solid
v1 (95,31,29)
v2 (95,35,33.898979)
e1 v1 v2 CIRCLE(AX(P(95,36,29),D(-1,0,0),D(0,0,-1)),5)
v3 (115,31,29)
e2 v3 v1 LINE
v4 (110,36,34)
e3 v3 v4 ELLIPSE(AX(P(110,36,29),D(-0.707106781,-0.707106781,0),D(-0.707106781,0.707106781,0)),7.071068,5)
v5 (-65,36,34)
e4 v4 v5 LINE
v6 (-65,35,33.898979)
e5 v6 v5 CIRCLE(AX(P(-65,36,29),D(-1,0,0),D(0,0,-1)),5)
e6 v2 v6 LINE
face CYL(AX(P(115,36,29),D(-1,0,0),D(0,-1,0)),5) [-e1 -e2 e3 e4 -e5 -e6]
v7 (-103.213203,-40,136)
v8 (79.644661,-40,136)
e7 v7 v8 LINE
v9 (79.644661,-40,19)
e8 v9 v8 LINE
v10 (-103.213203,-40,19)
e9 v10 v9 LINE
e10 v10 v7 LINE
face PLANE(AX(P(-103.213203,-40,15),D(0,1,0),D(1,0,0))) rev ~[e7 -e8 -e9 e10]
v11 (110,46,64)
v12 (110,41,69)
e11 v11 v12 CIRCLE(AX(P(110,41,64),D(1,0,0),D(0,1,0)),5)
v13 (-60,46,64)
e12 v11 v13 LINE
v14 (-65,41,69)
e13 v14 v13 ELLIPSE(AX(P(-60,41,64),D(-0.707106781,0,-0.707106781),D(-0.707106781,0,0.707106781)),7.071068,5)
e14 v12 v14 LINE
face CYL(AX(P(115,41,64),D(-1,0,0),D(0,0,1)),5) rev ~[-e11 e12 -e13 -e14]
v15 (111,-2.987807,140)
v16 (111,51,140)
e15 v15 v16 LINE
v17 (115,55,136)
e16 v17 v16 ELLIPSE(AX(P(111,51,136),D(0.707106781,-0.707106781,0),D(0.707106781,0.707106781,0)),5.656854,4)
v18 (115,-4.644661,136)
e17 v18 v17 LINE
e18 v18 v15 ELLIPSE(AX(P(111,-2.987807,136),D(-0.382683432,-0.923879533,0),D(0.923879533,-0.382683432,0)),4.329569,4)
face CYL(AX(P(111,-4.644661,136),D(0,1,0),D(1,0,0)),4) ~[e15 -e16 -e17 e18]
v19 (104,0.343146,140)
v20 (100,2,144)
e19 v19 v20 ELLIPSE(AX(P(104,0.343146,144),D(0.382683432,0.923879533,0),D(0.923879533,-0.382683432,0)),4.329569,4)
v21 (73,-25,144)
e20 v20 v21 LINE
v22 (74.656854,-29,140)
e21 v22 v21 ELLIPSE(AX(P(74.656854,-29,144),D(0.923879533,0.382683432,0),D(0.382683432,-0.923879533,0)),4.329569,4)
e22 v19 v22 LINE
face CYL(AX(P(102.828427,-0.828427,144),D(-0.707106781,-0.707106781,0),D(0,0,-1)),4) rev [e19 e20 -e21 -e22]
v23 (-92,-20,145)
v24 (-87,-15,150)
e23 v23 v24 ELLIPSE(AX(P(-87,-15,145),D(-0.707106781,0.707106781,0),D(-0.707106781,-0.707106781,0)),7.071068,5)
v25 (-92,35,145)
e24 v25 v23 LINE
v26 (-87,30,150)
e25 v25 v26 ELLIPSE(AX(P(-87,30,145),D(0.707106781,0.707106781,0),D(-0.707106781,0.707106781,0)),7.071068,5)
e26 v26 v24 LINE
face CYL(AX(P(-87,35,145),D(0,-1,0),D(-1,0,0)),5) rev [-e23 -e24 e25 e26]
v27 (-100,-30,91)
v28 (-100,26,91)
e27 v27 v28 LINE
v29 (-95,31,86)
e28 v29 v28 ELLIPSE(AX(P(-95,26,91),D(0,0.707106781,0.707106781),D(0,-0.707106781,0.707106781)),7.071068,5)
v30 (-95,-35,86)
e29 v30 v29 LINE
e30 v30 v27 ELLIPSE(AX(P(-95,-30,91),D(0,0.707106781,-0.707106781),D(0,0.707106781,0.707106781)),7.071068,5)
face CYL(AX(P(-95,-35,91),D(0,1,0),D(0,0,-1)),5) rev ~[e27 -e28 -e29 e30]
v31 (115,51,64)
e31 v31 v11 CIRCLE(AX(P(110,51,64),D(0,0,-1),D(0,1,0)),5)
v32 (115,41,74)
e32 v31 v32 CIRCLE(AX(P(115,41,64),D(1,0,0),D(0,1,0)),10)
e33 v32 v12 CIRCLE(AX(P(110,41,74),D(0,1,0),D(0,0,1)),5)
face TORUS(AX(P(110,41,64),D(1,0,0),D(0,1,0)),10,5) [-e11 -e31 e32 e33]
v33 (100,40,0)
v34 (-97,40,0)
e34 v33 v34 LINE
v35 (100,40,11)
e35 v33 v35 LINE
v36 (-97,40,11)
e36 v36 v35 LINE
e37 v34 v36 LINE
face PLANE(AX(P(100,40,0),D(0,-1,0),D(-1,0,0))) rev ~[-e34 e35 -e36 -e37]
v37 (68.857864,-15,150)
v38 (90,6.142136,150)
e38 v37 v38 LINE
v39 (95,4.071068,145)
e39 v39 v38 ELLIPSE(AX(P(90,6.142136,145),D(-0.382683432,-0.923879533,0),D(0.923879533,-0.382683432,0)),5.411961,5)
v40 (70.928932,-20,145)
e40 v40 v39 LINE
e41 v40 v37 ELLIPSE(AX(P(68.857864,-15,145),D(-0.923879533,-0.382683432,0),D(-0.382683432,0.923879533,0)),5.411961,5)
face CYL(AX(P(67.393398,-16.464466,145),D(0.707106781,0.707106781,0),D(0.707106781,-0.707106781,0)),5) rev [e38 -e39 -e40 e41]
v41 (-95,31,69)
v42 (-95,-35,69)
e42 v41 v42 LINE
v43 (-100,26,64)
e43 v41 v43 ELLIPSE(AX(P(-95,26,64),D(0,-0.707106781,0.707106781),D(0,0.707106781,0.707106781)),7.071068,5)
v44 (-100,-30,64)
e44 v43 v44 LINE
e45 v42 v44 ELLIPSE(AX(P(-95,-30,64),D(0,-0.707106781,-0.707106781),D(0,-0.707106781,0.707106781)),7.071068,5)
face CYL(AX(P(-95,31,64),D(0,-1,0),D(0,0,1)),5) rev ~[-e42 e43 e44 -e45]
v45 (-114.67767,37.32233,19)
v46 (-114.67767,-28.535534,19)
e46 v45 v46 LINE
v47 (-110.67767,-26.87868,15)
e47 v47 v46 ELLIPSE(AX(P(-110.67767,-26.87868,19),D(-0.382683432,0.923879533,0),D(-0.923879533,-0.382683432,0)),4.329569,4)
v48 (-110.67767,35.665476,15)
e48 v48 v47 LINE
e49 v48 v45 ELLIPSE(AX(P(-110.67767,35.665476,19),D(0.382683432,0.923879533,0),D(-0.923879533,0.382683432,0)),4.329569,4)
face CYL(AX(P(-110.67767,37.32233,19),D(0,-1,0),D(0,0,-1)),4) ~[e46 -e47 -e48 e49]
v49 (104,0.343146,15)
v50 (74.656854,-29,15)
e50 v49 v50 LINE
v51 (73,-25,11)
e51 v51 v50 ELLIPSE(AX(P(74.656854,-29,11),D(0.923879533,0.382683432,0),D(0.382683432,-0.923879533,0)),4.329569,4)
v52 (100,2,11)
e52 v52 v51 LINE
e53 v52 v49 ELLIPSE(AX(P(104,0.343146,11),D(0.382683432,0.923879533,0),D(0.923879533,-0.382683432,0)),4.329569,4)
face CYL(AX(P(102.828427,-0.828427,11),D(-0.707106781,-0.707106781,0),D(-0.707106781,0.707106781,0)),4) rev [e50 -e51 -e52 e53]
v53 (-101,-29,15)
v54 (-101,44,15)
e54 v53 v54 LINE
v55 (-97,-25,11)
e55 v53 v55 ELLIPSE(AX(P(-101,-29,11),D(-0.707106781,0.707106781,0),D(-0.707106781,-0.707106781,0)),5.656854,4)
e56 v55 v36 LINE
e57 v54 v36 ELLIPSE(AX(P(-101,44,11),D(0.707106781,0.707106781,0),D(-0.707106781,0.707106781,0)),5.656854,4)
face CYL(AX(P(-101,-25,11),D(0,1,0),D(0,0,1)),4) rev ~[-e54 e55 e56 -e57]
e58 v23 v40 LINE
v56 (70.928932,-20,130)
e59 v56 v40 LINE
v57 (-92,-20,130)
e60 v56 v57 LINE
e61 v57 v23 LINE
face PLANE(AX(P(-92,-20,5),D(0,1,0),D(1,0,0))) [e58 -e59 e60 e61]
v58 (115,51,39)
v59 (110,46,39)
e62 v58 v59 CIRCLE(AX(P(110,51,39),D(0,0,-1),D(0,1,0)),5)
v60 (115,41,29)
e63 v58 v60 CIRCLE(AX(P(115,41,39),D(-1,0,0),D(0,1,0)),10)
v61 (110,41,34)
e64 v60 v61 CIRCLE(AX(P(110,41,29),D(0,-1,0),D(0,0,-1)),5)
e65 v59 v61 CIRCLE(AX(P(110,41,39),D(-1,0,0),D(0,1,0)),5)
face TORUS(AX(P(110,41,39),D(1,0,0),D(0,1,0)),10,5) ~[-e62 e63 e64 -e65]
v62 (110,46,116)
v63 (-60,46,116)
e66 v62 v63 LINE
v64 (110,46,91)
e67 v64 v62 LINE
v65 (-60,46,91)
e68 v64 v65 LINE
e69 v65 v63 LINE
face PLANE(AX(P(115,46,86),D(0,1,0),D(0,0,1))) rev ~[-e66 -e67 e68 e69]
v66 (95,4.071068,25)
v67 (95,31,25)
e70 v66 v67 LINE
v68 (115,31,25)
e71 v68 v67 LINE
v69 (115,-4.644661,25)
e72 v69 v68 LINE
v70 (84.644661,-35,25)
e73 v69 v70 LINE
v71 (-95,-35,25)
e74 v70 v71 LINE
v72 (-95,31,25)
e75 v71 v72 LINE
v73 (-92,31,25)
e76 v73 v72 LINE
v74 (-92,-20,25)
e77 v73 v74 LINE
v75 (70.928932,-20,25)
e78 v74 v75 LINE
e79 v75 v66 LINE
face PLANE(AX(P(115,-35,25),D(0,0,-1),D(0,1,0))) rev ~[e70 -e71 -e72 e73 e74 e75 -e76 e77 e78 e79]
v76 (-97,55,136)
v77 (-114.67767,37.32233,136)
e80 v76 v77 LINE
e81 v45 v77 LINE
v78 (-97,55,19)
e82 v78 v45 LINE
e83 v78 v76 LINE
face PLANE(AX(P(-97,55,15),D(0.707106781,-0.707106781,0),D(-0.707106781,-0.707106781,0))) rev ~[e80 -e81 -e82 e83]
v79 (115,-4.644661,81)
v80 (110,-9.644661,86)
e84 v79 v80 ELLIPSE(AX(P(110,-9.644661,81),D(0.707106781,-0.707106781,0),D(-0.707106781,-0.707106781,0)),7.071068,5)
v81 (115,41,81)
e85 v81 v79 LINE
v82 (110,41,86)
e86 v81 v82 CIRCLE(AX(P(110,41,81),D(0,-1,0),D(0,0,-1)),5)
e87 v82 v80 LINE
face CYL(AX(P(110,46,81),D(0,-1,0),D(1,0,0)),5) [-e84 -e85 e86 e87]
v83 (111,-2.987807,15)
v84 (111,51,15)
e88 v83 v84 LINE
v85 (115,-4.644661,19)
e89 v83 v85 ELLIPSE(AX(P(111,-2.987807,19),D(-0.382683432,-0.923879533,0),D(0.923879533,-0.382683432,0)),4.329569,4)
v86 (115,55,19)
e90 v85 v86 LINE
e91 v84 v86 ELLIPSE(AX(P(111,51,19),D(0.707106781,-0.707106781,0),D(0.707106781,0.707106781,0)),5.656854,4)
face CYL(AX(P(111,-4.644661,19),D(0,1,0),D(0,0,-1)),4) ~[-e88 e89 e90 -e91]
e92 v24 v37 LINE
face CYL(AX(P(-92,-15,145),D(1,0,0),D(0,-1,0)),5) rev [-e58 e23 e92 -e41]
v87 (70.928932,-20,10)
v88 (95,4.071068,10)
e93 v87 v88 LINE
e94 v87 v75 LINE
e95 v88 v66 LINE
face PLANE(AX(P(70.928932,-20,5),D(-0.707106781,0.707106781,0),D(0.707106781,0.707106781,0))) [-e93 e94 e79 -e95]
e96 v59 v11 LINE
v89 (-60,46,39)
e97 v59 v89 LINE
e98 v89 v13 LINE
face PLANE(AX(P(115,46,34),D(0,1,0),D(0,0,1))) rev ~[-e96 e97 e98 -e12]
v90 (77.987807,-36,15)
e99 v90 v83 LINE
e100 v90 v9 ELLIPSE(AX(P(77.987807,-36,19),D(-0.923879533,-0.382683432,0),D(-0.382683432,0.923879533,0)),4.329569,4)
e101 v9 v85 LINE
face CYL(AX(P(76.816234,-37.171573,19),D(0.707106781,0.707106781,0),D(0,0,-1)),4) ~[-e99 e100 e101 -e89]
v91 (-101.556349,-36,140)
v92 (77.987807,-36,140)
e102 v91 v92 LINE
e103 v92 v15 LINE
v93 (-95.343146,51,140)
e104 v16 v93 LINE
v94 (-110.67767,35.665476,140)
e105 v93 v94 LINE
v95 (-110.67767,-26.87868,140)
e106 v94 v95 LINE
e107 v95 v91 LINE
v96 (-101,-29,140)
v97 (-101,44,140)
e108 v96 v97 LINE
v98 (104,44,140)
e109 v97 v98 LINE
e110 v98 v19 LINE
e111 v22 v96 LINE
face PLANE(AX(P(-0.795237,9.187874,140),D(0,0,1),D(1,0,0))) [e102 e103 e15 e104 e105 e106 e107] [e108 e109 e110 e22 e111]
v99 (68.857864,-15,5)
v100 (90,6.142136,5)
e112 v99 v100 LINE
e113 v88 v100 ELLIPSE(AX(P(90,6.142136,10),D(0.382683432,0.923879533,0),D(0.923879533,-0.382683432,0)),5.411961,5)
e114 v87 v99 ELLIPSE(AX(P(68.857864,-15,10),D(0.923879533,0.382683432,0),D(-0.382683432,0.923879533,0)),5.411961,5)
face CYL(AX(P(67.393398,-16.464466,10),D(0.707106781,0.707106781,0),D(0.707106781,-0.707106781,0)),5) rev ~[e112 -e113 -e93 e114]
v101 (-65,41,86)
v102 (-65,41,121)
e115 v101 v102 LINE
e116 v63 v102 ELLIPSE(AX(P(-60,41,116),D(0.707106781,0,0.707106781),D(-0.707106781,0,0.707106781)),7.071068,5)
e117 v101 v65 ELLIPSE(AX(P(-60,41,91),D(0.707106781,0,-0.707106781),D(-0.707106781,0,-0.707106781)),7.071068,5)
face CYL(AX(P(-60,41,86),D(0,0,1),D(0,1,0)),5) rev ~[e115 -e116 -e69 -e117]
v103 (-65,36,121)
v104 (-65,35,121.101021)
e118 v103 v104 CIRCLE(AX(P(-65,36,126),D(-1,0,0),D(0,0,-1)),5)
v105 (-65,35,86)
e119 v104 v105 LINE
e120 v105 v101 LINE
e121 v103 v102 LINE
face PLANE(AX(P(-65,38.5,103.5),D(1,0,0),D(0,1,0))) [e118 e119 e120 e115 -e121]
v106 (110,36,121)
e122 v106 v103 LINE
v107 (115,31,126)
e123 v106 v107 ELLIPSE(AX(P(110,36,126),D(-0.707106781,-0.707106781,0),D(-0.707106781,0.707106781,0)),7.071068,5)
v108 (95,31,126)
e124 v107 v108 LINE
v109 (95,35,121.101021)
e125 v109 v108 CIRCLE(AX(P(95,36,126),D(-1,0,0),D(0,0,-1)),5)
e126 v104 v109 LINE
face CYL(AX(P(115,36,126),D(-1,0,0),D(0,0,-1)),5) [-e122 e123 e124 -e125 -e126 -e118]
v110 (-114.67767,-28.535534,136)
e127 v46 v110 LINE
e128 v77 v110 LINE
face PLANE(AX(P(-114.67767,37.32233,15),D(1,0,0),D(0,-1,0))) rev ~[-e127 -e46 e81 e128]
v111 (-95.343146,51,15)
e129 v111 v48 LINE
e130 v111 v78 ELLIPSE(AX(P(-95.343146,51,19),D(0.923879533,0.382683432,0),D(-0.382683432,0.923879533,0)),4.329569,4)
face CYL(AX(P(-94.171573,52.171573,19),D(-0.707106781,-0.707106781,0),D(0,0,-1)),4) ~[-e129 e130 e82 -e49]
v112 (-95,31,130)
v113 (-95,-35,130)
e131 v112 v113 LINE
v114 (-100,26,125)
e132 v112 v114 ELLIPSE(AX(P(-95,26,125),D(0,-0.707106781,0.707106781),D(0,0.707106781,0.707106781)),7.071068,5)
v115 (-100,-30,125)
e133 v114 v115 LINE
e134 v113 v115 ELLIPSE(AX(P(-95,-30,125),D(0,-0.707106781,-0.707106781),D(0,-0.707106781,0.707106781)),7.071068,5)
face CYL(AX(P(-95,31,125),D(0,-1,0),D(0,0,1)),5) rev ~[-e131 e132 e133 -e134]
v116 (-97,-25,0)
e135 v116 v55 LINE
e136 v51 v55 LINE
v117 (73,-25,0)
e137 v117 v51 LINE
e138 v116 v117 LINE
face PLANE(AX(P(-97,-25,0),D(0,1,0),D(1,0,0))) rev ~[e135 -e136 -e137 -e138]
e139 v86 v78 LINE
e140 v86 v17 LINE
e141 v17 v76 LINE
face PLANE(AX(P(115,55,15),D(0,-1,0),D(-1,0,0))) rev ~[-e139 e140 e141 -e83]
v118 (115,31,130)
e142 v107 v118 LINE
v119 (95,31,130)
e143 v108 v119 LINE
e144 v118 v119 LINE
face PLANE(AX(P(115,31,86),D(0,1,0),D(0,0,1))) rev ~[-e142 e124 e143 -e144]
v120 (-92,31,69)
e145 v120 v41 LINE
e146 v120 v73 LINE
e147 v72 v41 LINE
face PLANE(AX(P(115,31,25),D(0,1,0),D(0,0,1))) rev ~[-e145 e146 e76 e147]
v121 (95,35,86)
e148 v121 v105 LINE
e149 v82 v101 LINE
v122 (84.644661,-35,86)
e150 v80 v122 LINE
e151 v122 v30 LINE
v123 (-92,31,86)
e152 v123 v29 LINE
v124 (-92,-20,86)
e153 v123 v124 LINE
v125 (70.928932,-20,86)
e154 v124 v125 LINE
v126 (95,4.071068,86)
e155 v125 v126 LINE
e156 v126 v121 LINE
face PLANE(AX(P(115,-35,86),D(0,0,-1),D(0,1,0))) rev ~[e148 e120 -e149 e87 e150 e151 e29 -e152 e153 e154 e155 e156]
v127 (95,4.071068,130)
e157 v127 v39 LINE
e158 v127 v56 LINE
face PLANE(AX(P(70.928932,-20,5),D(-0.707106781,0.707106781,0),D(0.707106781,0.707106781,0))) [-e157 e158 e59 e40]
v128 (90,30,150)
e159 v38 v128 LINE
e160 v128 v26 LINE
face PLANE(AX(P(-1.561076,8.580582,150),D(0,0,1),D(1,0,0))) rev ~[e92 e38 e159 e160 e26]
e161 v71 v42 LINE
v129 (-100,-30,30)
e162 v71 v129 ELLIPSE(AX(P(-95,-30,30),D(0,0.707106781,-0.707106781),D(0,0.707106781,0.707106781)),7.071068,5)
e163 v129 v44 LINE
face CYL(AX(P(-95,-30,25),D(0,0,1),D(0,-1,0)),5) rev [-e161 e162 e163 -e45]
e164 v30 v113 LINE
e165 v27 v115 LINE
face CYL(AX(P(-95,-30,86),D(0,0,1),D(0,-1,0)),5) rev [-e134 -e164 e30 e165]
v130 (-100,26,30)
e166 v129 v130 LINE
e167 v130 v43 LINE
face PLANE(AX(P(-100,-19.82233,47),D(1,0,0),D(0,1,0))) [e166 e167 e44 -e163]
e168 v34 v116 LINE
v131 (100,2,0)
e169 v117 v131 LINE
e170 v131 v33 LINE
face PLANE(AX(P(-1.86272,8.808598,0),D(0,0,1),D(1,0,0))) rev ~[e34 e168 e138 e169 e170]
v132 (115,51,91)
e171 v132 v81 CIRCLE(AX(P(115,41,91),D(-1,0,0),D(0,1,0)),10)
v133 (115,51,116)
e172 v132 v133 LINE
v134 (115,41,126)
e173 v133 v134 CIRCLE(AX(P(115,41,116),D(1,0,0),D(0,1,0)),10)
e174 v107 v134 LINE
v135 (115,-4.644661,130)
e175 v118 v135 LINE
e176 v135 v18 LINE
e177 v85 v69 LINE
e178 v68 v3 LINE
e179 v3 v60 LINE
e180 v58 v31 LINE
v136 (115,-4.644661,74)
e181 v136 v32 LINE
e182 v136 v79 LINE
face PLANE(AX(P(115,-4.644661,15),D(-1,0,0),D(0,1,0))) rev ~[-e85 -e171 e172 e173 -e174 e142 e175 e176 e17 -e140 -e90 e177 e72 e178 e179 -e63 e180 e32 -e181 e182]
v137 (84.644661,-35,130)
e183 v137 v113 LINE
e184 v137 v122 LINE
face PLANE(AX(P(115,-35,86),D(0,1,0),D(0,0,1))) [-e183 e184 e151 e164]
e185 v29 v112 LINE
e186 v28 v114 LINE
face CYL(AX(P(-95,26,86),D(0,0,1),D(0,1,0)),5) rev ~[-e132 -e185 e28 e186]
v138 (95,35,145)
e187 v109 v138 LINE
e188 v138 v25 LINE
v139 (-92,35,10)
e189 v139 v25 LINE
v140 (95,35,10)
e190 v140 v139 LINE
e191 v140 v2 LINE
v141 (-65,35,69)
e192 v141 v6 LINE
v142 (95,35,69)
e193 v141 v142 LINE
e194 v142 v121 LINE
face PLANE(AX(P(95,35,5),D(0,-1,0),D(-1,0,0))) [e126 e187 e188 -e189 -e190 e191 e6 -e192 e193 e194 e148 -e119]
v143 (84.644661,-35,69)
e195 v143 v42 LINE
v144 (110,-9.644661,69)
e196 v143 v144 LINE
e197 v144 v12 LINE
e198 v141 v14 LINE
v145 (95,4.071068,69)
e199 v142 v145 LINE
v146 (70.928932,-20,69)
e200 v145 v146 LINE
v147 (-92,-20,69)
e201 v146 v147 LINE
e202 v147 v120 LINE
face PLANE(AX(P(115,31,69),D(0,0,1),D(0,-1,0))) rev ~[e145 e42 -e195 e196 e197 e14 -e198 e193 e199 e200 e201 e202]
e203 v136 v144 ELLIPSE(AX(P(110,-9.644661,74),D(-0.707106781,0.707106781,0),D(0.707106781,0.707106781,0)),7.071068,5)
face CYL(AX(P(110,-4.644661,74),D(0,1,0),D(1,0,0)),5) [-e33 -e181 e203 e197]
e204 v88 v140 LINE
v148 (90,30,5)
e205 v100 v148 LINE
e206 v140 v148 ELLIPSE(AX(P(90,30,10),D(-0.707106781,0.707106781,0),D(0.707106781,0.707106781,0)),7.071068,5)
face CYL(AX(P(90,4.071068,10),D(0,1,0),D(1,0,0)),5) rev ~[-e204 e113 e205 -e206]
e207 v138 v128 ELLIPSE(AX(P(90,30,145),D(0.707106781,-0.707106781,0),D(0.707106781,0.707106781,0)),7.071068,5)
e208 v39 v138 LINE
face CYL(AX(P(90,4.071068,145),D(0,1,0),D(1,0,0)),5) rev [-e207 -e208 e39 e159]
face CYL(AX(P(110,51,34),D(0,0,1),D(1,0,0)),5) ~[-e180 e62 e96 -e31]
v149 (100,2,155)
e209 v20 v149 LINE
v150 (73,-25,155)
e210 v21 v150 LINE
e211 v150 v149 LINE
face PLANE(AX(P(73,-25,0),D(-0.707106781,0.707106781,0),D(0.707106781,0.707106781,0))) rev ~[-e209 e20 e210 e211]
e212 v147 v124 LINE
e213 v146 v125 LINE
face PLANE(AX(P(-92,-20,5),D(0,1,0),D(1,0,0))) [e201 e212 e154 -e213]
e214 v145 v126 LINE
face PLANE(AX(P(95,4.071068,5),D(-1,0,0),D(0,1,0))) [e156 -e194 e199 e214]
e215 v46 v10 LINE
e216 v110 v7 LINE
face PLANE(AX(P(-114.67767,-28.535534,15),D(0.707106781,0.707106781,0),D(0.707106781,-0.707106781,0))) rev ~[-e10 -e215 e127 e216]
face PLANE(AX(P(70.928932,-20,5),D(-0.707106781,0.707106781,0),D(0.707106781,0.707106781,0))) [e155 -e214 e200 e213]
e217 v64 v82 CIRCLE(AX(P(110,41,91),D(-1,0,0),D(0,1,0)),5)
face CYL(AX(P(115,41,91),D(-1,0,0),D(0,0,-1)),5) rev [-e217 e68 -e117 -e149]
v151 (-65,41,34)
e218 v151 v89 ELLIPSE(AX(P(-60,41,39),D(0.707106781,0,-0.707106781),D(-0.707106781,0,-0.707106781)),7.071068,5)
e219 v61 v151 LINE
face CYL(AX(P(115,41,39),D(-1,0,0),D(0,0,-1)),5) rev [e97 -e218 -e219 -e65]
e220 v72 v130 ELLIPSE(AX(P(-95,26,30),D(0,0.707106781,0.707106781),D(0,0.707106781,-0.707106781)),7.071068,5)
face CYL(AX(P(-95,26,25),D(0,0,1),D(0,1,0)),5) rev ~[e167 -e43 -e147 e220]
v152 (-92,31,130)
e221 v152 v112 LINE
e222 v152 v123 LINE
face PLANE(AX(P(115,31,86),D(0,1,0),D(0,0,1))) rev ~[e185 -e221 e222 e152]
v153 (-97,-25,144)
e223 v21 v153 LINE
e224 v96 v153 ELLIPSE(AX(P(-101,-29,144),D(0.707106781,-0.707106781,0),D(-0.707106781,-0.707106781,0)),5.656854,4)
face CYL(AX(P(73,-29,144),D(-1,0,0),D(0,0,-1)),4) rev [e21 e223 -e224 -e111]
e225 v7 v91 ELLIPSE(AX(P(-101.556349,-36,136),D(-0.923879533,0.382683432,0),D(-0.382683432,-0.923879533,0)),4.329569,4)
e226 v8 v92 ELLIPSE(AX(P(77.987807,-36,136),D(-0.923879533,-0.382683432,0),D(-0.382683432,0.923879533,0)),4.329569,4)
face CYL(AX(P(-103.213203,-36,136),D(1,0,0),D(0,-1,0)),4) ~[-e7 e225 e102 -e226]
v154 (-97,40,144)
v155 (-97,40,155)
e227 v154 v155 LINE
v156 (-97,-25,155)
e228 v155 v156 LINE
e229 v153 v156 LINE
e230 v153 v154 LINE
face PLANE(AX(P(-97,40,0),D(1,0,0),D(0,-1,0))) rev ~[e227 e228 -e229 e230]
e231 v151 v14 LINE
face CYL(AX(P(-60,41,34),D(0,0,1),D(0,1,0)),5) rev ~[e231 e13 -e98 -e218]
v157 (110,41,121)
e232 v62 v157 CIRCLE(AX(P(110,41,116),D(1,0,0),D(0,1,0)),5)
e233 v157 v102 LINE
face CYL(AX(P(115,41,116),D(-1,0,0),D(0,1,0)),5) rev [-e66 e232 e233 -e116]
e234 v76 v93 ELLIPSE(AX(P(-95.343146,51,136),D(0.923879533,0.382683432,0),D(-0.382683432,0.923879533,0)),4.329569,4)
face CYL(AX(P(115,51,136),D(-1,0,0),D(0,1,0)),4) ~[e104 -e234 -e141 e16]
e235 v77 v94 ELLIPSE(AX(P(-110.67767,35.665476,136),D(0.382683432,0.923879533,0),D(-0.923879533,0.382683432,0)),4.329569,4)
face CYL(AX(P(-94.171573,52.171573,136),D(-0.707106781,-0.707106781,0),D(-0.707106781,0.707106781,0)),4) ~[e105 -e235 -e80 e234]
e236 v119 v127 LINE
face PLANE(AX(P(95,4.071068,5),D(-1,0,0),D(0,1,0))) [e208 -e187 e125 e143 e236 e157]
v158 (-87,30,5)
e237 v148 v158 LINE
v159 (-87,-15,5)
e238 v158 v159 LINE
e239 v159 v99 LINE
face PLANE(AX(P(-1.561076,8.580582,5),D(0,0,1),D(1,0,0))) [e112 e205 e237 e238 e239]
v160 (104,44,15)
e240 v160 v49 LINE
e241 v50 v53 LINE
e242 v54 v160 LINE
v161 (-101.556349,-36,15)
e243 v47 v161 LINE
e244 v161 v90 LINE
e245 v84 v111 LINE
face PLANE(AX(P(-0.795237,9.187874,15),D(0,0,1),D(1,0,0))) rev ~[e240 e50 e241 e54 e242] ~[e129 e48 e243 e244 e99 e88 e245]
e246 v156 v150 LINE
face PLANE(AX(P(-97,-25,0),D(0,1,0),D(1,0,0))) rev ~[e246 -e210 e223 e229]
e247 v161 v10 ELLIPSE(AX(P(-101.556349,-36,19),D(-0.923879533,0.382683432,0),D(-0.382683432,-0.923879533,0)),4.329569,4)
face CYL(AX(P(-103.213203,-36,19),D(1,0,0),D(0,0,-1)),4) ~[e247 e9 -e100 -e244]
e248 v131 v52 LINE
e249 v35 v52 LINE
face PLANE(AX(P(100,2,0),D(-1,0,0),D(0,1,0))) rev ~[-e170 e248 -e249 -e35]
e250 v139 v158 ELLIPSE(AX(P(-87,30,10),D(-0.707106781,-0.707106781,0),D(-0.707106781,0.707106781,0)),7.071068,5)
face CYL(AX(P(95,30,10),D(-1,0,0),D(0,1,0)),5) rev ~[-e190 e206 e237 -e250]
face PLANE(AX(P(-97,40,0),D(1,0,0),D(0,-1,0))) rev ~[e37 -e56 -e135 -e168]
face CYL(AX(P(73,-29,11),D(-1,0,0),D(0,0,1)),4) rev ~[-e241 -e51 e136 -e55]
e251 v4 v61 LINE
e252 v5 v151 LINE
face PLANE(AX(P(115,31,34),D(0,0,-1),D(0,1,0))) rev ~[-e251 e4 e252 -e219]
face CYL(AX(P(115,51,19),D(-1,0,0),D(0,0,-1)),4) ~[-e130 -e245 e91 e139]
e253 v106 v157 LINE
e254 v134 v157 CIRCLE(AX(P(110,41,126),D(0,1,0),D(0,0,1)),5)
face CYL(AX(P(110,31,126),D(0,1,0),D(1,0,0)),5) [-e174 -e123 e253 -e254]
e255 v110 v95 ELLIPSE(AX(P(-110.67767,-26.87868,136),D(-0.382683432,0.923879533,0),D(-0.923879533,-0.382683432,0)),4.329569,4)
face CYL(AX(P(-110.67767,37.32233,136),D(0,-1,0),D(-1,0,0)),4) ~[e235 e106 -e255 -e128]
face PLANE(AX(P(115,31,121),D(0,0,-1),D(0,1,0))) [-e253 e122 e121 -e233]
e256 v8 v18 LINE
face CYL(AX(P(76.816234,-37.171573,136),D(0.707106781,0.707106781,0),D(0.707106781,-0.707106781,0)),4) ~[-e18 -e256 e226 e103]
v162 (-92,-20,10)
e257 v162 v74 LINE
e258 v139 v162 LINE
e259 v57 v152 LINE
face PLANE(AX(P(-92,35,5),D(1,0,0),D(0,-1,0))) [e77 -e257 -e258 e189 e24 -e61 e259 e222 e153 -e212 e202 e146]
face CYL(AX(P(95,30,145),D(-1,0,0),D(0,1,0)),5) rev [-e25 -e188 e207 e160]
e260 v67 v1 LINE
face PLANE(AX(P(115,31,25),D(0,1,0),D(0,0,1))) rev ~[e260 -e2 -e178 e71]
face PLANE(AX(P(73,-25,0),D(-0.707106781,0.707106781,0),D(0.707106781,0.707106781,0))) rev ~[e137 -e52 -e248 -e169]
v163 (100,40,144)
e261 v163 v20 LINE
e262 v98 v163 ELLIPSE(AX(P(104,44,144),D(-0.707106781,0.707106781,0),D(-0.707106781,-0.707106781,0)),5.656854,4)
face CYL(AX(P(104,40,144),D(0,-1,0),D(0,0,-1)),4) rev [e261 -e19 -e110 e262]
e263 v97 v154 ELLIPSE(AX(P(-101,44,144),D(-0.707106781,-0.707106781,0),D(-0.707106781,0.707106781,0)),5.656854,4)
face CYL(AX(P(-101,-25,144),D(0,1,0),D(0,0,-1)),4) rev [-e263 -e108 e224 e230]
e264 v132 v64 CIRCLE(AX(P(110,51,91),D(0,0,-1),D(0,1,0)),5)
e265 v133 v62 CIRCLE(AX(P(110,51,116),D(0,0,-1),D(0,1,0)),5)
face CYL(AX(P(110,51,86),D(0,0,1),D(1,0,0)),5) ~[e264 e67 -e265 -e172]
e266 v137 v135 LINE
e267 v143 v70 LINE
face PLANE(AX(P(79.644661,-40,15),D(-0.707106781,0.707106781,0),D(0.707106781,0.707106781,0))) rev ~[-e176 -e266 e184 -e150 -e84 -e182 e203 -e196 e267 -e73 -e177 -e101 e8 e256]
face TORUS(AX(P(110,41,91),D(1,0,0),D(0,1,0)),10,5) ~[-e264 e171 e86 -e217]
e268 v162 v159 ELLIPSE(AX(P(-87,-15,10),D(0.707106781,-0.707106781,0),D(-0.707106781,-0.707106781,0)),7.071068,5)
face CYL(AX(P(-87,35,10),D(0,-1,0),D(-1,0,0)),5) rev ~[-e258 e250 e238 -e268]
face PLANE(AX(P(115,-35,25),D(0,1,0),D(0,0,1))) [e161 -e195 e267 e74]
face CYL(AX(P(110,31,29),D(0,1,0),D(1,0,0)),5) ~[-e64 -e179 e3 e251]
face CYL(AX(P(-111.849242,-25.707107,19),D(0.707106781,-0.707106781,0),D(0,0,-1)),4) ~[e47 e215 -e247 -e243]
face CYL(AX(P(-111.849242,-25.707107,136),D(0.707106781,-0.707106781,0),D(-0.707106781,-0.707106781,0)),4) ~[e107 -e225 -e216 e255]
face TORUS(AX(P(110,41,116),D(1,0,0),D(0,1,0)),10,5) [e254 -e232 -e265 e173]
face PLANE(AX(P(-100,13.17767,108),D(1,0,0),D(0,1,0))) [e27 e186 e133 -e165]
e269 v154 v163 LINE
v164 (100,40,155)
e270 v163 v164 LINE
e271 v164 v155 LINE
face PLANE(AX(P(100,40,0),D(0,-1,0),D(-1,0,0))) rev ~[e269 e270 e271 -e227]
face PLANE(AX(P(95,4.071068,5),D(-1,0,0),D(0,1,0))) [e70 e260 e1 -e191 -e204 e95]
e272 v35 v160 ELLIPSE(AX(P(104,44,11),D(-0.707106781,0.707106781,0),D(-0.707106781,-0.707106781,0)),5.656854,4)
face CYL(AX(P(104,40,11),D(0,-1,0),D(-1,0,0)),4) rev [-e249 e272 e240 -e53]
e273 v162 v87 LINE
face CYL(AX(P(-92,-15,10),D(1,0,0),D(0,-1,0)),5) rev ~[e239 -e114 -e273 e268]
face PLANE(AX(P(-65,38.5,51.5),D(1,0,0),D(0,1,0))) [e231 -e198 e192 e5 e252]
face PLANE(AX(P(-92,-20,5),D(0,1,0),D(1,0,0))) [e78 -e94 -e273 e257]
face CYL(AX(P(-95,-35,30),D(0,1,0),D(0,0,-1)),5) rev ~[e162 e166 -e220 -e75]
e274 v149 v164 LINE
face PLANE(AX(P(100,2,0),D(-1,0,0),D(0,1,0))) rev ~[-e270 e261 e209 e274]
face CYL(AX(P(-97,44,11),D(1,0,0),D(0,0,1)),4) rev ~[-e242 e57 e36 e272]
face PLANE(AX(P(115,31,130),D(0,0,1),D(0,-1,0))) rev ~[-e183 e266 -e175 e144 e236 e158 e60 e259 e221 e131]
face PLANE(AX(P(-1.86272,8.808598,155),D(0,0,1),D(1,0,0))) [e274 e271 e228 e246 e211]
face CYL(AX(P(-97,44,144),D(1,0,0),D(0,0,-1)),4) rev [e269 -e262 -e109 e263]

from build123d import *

# Parameters (mm, degrees)
F1_DEPTH = 155
F2_START = 15
F2_DEPTH = 125
F3_R     = 4
F4_W     = 30.3553390593
F4_H     = 44
F5_DEPTH = 215
F4_W_2   = 15
F4_H_2   = 35
F6_DEPTH = 180
F7_START = 5
F7_DEPTH = 145
F8_R     = 5


with BuildPart() as f1:
    # F0 (on Top) → F1 (new body)
    with BuildSketch(Plane.XY):
        Polygon((73, -25), (100, 2), (100, 40), (-97, 40), (-97, -25), align=None)
        Polygon((95, 35), (95, 4.0710678119), (70.9289321881, -20), (-92, -20), (-92, 35), align=None, mode=Mode.SUBTRACT)
        Polygon((70.9289321881, -20), (95, 4.0710678119), (95, 35), (-92, 35), (-92, -20), align=None)
    extrude(amount=F1_DEPTH)

    # F0 (on Top) → F2 (join)
    with BuildSketch(Plane.XY.offset(F2_START)):
        Polygon((-114.6776695297, -28.5355339059), (-103.2132034356, -40), (79.6446609407, -40), (115, -4.6446609407), (115, 55), (-97, 55), (-114.6776695297, 37.3223304703), align=None)
        Polygon((100, 40), (100, 2), (73, -25), (-97, -25), (-97, 40), align=None, mode=Mode.SUBTRACT)
    extrude(amount=F2_DEPTH)

    # F3
    f3_edges = [f1.edges().sort_by_distance(p)[0] for p in [
        (97.32233, -22.32233, 140),
        (115, 25.17767, 140),
        (9, 55, 140),
        (-105.838835, 46.161165, 140),
        (-114.67767, 4.393398, 140),
        (-108.945436, -34.267767, 140),
        (-11.784271, -40, 140),
        (100, 21, 140),
        (86.5, -11.5, 140),
        (-12, -25, 140),
        (-97, 7.5, 140),
        (1.5, 40, 140),
        (97.32233, -22.32233, 15),
        (115, 25.17767, 15),
        (9, 55, 15),
        (-105.838835, 46.161165, 15),
        (-114.67767, 4.393398, 15),
        (-108.945436, -34.267767, 15),
        (-11.784271, -40, 15),
        (100, 21, 15),
        (86.5, -11.5, 15),
        (-12, -25, 15),
        (-97, 7.5, 15),
        (1.5, 40, 15),
    ]]
    fillet(f3_edges, radius=F3_R)

    # F4 (on face) → F5 (cut)
    with BuildSketch(Plane.YZ.offset(115)):
        Polygon((31, 121), (31, 130), (-4.6446609407, 130), (-4.6446609407, 86), (31, 86), align=None)
        with Locations((-19.8223304703, 108)):
            Rectangle(F4_W, F4_H)
        with Locations((-19.8223304703, 47)):
            Rectangle(F4_W, F4_H)
        Polygon((31, 69), (-4.6446609407, 69), (-4.6446609407, 25), (31, 25), (31, 34), align=None)
    extrude(amount=-F5_DEPTH, mode=Mode.SUBTRACT)

    # F4 (on face) → F6 (cut)
    with BuildSketch(Plane.YZ.offset(115)):
        with Locations((38.5, 51.5)):
            Rectangle(F4_W_2, F4_H_2)
        with Locations((38.5, 103.5)):
            Rectangle(F4_W_2, F4_H_2)
    extrude(amount=-F6_DEPTH, mode=Mode.SUBTRACT)

    # F0 (on Top) → F7 (cut)
    with BuildSketch(Plane.XY.offset(F7_START)):
        Polygon((70.9289321881, -20), (95, 4.0710678119), (95, 35), (-92, 35), (-92, -20), align=None)
    extrude(amount=F7_DEPTH, mode=Mode.SUBTRACT)

    # F8
    f8_edges = [f1.edges().sort_by_distance(p)[0] for p in [
        (105, 31, 121),
        (105, 31, 34),
        (-100, 31, 108),
        (-100, -2, 130),
        (-100, -35, 108),
        (-100, -2, 86),
        (-100, -35, 47),
        (-100, -2, 25),
        (-100, 31, 47),
        (-100, -2, 69),
        (82.964466, -7.964466, 5),
        (95, 19.535534, 5),
        (1.5, 35, 5),
        (-92, 7.5, 5),
        (-10.535534, -20, 5),
        (82.964466, -7.964466, 150),
        (95, 19.535534, 150),
        (1.5, 35, 150),
        (-92, 7.5, 150),
        (-10.535534, -20, 150),
        (25, 46, 86),
        (25, 46, 121),
        (115, 46, 103.5),
        (-65, 46, 103.5),
        (25, 46, 34),
        (25, 46, 69),
        (115, 46, 51.5),
        (-65, 46, 51.5),
        (115, 38.5, 34),
        (115, 20.67767, 69),
        (115, 20.67767, 86),
        (115, 38.5, 121),
    ]]
    fillet(f8_edges, radius=F8_R)


solid = f1.part
